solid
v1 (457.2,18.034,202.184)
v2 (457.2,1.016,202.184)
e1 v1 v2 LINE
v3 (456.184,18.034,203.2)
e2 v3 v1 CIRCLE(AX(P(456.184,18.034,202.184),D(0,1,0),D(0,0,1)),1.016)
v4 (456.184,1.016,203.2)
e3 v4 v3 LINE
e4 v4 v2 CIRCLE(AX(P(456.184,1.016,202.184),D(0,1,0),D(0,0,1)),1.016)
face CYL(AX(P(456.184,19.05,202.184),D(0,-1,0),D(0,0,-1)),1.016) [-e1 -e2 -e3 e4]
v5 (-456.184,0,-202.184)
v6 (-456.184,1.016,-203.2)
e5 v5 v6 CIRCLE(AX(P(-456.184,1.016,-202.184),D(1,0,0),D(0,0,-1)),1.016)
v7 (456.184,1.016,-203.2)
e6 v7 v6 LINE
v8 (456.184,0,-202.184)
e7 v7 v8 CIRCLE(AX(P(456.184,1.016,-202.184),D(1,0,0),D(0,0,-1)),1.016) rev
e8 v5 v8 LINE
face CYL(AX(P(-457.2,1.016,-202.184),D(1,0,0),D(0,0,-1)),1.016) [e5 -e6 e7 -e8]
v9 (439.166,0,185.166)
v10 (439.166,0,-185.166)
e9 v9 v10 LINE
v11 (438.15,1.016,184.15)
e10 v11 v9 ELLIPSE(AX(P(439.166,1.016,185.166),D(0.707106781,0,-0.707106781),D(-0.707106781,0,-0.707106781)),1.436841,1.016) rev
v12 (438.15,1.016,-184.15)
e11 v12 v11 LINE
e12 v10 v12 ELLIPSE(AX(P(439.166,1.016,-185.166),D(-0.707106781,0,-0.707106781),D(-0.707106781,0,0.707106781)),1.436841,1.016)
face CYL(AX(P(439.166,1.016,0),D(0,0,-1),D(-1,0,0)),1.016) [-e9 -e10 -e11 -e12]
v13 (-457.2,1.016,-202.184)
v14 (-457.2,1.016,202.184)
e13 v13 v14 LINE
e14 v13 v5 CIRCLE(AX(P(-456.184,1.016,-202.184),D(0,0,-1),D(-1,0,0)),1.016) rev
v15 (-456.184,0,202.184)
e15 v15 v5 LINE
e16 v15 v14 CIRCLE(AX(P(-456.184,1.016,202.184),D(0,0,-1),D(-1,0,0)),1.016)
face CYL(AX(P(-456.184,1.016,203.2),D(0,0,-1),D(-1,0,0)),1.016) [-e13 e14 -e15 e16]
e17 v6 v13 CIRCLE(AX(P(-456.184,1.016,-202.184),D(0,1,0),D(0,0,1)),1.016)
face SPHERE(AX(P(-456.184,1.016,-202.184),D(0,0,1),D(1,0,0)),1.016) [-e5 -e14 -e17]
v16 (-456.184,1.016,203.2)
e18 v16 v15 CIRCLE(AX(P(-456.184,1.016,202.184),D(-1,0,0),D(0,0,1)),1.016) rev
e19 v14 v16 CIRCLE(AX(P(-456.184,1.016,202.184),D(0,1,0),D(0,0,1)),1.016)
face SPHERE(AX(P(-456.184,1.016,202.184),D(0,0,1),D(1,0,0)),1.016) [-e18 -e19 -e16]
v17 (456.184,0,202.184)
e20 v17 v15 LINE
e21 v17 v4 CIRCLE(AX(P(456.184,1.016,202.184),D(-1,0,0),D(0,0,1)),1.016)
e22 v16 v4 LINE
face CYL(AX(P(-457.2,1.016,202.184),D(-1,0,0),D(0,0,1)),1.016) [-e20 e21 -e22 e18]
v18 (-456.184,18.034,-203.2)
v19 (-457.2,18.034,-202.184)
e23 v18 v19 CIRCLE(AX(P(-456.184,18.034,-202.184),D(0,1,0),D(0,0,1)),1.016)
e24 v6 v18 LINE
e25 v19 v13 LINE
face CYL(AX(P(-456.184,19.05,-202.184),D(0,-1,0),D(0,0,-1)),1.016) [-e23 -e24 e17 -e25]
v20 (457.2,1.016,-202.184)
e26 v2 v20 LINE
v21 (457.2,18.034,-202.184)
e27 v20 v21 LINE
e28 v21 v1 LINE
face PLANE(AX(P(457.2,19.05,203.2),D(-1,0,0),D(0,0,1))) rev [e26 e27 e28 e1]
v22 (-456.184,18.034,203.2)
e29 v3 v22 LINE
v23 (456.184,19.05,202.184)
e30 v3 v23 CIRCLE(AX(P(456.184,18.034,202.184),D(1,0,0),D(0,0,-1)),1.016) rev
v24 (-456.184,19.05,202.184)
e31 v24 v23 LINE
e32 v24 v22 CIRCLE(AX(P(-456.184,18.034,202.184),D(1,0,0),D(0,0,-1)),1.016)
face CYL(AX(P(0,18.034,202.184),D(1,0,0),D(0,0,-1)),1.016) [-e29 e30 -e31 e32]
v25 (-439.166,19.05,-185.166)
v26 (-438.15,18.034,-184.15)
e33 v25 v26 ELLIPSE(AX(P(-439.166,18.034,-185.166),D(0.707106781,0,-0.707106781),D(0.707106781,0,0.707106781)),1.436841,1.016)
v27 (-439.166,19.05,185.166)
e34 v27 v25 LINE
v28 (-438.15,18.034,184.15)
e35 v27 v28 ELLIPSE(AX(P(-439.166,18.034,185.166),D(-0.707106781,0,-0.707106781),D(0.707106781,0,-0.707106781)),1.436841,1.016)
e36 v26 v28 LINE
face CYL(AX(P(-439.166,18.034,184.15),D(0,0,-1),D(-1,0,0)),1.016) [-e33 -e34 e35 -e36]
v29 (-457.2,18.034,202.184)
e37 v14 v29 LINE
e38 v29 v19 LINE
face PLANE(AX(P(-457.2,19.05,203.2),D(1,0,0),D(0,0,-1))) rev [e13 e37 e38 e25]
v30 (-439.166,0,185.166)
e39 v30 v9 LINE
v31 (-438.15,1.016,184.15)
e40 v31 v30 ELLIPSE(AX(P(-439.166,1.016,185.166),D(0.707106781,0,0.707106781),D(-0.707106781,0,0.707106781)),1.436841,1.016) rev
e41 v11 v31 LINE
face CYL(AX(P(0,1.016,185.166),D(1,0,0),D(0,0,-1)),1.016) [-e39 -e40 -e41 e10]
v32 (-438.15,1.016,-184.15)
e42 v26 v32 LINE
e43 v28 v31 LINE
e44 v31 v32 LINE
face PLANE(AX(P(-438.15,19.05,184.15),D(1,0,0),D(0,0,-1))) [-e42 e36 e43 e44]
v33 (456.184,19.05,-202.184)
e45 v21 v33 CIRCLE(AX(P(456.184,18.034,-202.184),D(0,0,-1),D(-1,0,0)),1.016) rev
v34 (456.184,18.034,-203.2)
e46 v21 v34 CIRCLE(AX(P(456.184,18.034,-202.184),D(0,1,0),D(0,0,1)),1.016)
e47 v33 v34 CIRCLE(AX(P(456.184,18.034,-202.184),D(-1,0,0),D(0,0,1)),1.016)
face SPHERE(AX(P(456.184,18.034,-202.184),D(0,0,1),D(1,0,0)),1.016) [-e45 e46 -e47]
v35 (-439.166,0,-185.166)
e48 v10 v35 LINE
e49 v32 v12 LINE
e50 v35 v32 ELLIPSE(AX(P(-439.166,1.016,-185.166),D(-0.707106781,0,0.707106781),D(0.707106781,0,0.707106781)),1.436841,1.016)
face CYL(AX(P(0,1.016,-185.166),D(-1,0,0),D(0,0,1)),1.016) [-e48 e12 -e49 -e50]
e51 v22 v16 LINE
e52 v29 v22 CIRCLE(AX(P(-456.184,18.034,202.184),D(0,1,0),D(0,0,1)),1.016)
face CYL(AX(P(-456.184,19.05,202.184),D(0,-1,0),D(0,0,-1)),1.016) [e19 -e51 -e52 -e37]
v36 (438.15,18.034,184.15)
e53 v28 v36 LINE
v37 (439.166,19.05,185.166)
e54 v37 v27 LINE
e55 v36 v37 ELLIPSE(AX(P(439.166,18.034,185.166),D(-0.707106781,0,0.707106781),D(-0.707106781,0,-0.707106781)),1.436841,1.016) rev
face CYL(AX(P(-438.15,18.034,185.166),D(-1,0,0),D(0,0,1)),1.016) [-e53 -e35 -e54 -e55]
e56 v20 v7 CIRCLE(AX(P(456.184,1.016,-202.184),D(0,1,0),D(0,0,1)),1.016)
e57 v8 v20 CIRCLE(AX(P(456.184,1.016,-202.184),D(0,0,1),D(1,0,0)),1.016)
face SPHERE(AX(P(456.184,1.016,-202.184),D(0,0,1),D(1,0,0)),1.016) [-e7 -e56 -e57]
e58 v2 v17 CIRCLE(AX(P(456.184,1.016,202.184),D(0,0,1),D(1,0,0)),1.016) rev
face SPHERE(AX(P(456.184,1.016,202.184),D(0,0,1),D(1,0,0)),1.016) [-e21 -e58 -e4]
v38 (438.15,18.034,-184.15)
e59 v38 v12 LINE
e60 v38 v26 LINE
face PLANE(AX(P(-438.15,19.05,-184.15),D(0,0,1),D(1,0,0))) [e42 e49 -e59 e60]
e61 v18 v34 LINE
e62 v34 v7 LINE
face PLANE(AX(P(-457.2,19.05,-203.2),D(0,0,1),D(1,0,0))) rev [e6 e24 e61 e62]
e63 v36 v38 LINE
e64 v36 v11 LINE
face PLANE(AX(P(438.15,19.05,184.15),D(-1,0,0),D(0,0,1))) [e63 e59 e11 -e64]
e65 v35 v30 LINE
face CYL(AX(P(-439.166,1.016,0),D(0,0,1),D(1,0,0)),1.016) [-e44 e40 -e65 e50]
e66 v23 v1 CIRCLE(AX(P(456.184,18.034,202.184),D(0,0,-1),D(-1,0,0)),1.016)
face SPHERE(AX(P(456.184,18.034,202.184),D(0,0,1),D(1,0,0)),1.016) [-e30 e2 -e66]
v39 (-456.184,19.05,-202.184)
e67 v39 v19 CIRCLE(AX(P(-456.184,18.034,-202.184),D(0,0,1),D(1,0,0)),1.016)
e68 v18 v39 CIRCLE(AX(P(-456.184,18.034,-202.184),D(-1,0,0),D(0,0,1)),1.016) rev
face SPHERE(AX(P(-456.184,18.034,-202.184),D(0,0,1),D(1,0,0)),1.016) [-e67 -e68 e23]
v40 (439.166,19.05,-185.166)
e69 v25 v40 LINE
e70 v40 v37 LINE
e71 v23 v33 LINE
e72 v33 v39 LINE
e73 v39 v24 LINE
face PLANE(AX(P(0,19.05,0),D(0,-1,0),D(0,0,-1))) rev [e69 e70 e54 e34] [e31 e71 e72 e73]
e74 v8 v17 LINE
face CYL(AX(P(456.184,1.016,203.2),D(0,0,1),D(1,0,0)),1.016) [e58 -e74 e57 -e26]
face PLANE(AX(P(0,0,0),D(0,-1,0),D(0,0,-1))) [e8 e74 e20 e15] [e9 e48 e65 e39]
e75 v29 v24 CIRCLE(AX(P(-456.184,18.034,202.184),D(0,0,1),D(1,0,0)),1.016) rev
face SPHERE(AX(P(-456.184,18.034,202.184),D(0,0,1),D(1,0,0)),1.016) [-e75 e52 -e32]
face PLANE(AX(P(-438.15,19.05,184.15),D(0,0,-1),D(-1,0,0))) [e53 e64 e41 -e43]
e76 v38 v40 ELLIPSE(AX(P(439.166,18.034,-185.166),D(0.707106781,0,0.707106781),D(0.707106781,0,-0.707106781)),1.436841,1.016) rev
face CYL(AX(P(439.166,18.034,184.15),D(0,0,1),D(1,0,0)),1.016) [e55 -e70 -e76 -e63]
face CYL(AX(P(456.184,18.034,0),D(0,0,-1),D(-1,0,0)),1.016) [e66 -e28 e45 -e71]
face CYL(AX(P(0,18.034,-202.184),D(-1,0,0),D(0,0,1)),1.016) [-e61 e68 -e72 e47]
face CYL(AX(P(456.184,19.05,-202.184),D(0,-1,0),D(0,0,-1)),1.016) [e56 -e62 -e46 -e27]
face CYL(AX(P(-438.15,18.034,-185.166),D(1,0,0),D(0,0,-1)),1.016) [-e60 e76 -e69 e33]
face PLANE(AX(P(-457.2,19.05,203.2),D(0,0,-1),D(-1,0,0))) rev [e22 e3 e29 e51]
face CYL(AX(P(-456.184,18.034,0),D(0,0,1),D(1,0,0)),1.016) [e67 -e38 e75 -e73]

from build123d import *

# Parameters (mm, degrees)
SKETCH1_W           = 914.4
SKETCH1_H           = 406.4
SKETCH1_W_2         = 876.3
SKETCH1_H_2         = 368.3
BOSS_EXTRUDE1_DEPTH = 19.05
FILLET1_R           = 1.016
FILLET2_R           = 1.016


with BuildPart() as part:
    # Sketch1 → Boss-Extrude1 (new body)
    with BuildSketch(Plane(origin=(0, 0, 0), x_dir=(1, 0, 0), z_dir=(0, 1, 0))):
        Rectangle(SKETCH1_W, SKETCH1_H)
        Rectangle(SKETCH1_W_2, SKETCH1_H_2, mode=Mode.SUBTRACT)
    extrude(amount=BOSS_EXTRUDE1_DEPTH)

    # Fillet1
    fillet1_edges = [part.edges().sort_by_distance(p)[0] for p in [
        (-457.2, 19.05, 0),
        (438.15, 0, 0),
        (0, 0, -184.15),
        (-438.15, 0, 0),
        (0, 0, 184.15),
        (438.15, 19.05, 0),
        (0, 19.05, 203.2),
        (0, 19.05, -184.15),
        (-438.15, 19.05, 0),
        (0, 19.05, 184.15),
        (457.2, 19.05, 0),
        (0, 0, 203.2),
        (-457.2, 0, 0),
        (0, 0, -203.2),
        (457.2, 0, 0),
        (0, 19.05, -203.2),
    ]]
    fillet(fillet1_edges, radius=FILLET1_R)

    # Fillet2
    # the kernel refuses this fillet: 1.016 mm, written as the material it takes off along each edge
    with BuildSketch(Plane(origin=(456.184, 1.016, 202.184), x_dir=(1, 0, 0), z_dir=(0, 0, 1))) as fillet2_piece_1_section:
        Polygon((0, 0), (FILLET2_R * 1.02, 0), (FILLET2_R * 1.02, -FILLET2_R * 1.02), (0, -FILLET2_R * 1.02), align=None)
    fillet2_piece_1 = extrude(amount=FILLET2_R * 1.02, mode=Mode.PRIVATE)
    fillet2_piece_1 = fillet2_piece_1 - Plane(origin=(456.184, 1.016, 202.184), x_dir=(-0.7071067811865475, 0.7071067811865475, 0), z_dir=(0, 0, 1)) * Sphere(FILLET2_R, mode=Mode.PRIVATE)
    add(fillet2_piece_1, mode=Mode.SUBTRACT)
    with BuildSketch(Plane(origin=(-456.184, 1.016, 202.184), x_dir=(-1, 0, 0), z_dir=(0, 0, 1))) as fillet2_piece_2_section:
        Polygon((0, 0), (FILLET2_R * 1.02, 0), (FILLET2_R * 1.02, FILLET2_R * 1.02), (0, FILLET2_R * 1.02), align=None)
    fillet2_piece_2 = extrude(amount=FILLET2_R * 1.02, mode=Mode.PRIVATE)
    fillet2_piece_2 = fillet2_piece_2 - Plane(origin=(-456.184, 1.016, 202.184), x_dir=(0.7071067811865475, 0.7071067811865475, 0), z_dir=(0, 0, 1)) * Sphere(FILLET2_R, mode=Mode.PRIVATE)
    add(fillet2_piece_2, mode=Mode.SUBTRACT)
    with BuildSketch(Plane(origin=(456.184, 1.016, -202.184), x_dir=(0, 0, -1), z_dir=(1, 0, 0))) as fillet2_piece_3_section:
        Polygon((0, 0), (FILLET2_R * 1.02, 0), (FILLET2_R * 1.02, -FILLET2_R * 1.02), (0, -FILLET2_R * 1.02), align=None)
    fillet2_piece_3 = extrude(amount=FILLET2_R * 1.02, mode=Mode.PRIVATE)
    fillet2_piece_3 = fillet2_piece_3 - Plane(origin=(456.184, 1.016, -202.184), x_dir=(0, 0.7071067811865475, 0.7071067811865475), z_dir=(1, 0, 0)) * Sphere(FILLET2_R, mode=Mode.PRIVATE)
    add(fillet2_piece_3, mode=Mode.SUBTRACT)
    with BuildSketch(Plane(origin=(-456.184, 1.016, -202.184), x_dir=(0, 0, -1), z_dir=(-1, 0, 0))) as fillet2_piece_4_section:
        Polygon((0, 0), (FILLET2_R * 1.02, 0), (FILLET2_R * 1.02, FILLET2_R * 1.02), (0, FILLET2_R * 1.02), align=None)
    fillet2_piece_4 = extrude(amount=FILLET2_R * 1.02, mode=Mode.PRIVATE)
    fillet2_piece_4 = fillet2_piece_4 - Plane(origin=(-456.184, 1.016, -202.184), x_dir=(0, 0.7071067811865475, 0.7071067811865475), z_dir=(-1, 0, 0)) * Sphere(FILLET2_R, mode=Mode.PRIVATE)
    add(fillet2_piece_4, mode=Mode.SUBTRACT)
    with BuildSketch(Plane(origin=(-456.184, 18.034, -202.184), x_dir=(0, 0, -1), z_dir=(-1, 0, 0))) as fillet2_piece_5_section:
        Polygon((0, 0), (FILLET2_R * 1.02, 0), (FILLET2_R * 1.02, -FILLET2_R * 1.02), (0, -FILLET2_R * 1.02), align=None)
    fillet2_piece_5 = extrude(amount=FILLET2_R * 1.02, mode=Mode.PRIVATE)
    fillet2_piece_5 = fillet2_piece_5 - Plane(origin=(-456.184, 18.034, -202.184), x_dir=(0, -0.7071067811865475, 0.7071067811865475), z_dir=(-1, 0, 0)) * Sphere(FILLET2_R, mode=Mode.PRIVATE)
    add(fillet2_piece_5, mode=Mode.SUBTRACT)
    with BuildSketch(Plane(origin=(456.184, 18.034, -202.184), x_dir=(0, 0, -1), z_dir=(1, 0, 0))) as fillet2_piece_6_section:
        Polygon((0, 0), (FILLET2_R * 1.02, 0), (FILLET2_R * 1.02, FILLET2_R * 1.02), (0, FILLET2_R * 1.02), align=None)
    fillet2_piece_6 = extrude(amount=FILLET2_R * 1.02, mode=Mode.PRIVATE)
    fillet2_piece_6 = fillet2_piece_6 - Plane(origin=(456.184, 18.034, -202.184), x_dir=(0, -0.7071067811865475, 0.7071067811865475), z_dir=(1, 0, 0)) * Sphere(FILLET2_R, mode=Mode.PRIVATE)
    add(fillet2_piece_6, mode=Mode.SUBTRACT)
    with BuildSketch(Plane(origin=(-456.184, 18.034, 202.184), x_dir=(-1, 0, 0), z_dir=(0, 0, 1))) as fillet2_piece_7_section:
        Polygon((0, 0), (FILLET2_R * 1.02, 0), (FILLET2_R * 1.02, -FILLET2_R * 1.02), (0, -FILLET2_R * 1.02), align=None)
    fillet2_piece_7 = extrude(amount=FILLET2_R * 1.02, mode=Mode.PRIVATE)
    fillet2_piece_7 = fillet2_piece_7 - Plane(origin=(-456.184, 18.034, 202.184), x_dir=(0.7071067811865475, -0.7071067811865475, 0), z_dir=(0, 0, 1)) * Sphere(FILLET2_R, mode=Mode.PRIVATE)
    add(fillet2_piece_7, mode=Mode.SUBTRACT)
    with BuildSketch(Plane(origin=(456.184, 18.034, 202.184), x_dir=(1, 0, 0), z_dir=(0, 0, 1))) as fillet2_piece_8_section:
        Polygon((0, 0), (FILLET2_R * 1.02, 0), (FILLET2_R * 1.02, FILLET2_R * 1.02), (0, FILLET2_R * 1.02), align=None)
    fillet2_piece_8 = extrude(amount=FILLET2_R * 1.02, mode=Mode.PRIVATE)
    fillet2_piece_8 = fillet2_piece_8 - Plane(origin=(456.184, 18.034, 202.184), x_dir=(-0.7071067811865475, -0.7071067811865475, 0), z_dir=(0, 0, 1)) * Sphere(FILLET2_R, mode=Mode.PRIVATE)
    add(fillet2_piece_8, mode=Mode.SUBTRACT)
    with BuildSketch(Plane(origin=(-457.2, 1.016, -203.2), x_dir=(0, 0, 1), z_dir=(0, 1, 0)), Plane(origin=(-457.2, 1.016, 203.2), x_dir=(1, 0, 0), z_dir=(0, 1, 0))) as fillet2_piece_9:
        with BuildLine():
            CenterArc((FILLET2_R, FILLET2_R), FILLET2_R, 180, 90)
            Line((0, FILLET2_R), (0, 0))
            Line((0, 0), (FILLET2_R, 0))
        make_face()
    extrude(amount=17.018, mode=Mode.SUBTRACT)
    with BuildSketch(Plane(origin=(457.2, 1.016, -203.2), x_dir=(0, 0, 1), z_dir=(0, 1, 0)), Plane(origin=(457.2, 1.016, 203.2), x_dir=(-1, 0, 0), z_dir=(0, 1, 0))) as fillet2_piece_10:
        with BuildLine():
            CenterArc((FILLET2_R, -FILLET2_R), FILLET2_R, 90, 90)
            Line((0, -FILLET2_R), (0, 0))
            Line((0, 0), (FILLET2_R, 0))
        make_face()
    extrude(amount=17.018, mode=Mode.SUBTRACT)


solid = part.part
